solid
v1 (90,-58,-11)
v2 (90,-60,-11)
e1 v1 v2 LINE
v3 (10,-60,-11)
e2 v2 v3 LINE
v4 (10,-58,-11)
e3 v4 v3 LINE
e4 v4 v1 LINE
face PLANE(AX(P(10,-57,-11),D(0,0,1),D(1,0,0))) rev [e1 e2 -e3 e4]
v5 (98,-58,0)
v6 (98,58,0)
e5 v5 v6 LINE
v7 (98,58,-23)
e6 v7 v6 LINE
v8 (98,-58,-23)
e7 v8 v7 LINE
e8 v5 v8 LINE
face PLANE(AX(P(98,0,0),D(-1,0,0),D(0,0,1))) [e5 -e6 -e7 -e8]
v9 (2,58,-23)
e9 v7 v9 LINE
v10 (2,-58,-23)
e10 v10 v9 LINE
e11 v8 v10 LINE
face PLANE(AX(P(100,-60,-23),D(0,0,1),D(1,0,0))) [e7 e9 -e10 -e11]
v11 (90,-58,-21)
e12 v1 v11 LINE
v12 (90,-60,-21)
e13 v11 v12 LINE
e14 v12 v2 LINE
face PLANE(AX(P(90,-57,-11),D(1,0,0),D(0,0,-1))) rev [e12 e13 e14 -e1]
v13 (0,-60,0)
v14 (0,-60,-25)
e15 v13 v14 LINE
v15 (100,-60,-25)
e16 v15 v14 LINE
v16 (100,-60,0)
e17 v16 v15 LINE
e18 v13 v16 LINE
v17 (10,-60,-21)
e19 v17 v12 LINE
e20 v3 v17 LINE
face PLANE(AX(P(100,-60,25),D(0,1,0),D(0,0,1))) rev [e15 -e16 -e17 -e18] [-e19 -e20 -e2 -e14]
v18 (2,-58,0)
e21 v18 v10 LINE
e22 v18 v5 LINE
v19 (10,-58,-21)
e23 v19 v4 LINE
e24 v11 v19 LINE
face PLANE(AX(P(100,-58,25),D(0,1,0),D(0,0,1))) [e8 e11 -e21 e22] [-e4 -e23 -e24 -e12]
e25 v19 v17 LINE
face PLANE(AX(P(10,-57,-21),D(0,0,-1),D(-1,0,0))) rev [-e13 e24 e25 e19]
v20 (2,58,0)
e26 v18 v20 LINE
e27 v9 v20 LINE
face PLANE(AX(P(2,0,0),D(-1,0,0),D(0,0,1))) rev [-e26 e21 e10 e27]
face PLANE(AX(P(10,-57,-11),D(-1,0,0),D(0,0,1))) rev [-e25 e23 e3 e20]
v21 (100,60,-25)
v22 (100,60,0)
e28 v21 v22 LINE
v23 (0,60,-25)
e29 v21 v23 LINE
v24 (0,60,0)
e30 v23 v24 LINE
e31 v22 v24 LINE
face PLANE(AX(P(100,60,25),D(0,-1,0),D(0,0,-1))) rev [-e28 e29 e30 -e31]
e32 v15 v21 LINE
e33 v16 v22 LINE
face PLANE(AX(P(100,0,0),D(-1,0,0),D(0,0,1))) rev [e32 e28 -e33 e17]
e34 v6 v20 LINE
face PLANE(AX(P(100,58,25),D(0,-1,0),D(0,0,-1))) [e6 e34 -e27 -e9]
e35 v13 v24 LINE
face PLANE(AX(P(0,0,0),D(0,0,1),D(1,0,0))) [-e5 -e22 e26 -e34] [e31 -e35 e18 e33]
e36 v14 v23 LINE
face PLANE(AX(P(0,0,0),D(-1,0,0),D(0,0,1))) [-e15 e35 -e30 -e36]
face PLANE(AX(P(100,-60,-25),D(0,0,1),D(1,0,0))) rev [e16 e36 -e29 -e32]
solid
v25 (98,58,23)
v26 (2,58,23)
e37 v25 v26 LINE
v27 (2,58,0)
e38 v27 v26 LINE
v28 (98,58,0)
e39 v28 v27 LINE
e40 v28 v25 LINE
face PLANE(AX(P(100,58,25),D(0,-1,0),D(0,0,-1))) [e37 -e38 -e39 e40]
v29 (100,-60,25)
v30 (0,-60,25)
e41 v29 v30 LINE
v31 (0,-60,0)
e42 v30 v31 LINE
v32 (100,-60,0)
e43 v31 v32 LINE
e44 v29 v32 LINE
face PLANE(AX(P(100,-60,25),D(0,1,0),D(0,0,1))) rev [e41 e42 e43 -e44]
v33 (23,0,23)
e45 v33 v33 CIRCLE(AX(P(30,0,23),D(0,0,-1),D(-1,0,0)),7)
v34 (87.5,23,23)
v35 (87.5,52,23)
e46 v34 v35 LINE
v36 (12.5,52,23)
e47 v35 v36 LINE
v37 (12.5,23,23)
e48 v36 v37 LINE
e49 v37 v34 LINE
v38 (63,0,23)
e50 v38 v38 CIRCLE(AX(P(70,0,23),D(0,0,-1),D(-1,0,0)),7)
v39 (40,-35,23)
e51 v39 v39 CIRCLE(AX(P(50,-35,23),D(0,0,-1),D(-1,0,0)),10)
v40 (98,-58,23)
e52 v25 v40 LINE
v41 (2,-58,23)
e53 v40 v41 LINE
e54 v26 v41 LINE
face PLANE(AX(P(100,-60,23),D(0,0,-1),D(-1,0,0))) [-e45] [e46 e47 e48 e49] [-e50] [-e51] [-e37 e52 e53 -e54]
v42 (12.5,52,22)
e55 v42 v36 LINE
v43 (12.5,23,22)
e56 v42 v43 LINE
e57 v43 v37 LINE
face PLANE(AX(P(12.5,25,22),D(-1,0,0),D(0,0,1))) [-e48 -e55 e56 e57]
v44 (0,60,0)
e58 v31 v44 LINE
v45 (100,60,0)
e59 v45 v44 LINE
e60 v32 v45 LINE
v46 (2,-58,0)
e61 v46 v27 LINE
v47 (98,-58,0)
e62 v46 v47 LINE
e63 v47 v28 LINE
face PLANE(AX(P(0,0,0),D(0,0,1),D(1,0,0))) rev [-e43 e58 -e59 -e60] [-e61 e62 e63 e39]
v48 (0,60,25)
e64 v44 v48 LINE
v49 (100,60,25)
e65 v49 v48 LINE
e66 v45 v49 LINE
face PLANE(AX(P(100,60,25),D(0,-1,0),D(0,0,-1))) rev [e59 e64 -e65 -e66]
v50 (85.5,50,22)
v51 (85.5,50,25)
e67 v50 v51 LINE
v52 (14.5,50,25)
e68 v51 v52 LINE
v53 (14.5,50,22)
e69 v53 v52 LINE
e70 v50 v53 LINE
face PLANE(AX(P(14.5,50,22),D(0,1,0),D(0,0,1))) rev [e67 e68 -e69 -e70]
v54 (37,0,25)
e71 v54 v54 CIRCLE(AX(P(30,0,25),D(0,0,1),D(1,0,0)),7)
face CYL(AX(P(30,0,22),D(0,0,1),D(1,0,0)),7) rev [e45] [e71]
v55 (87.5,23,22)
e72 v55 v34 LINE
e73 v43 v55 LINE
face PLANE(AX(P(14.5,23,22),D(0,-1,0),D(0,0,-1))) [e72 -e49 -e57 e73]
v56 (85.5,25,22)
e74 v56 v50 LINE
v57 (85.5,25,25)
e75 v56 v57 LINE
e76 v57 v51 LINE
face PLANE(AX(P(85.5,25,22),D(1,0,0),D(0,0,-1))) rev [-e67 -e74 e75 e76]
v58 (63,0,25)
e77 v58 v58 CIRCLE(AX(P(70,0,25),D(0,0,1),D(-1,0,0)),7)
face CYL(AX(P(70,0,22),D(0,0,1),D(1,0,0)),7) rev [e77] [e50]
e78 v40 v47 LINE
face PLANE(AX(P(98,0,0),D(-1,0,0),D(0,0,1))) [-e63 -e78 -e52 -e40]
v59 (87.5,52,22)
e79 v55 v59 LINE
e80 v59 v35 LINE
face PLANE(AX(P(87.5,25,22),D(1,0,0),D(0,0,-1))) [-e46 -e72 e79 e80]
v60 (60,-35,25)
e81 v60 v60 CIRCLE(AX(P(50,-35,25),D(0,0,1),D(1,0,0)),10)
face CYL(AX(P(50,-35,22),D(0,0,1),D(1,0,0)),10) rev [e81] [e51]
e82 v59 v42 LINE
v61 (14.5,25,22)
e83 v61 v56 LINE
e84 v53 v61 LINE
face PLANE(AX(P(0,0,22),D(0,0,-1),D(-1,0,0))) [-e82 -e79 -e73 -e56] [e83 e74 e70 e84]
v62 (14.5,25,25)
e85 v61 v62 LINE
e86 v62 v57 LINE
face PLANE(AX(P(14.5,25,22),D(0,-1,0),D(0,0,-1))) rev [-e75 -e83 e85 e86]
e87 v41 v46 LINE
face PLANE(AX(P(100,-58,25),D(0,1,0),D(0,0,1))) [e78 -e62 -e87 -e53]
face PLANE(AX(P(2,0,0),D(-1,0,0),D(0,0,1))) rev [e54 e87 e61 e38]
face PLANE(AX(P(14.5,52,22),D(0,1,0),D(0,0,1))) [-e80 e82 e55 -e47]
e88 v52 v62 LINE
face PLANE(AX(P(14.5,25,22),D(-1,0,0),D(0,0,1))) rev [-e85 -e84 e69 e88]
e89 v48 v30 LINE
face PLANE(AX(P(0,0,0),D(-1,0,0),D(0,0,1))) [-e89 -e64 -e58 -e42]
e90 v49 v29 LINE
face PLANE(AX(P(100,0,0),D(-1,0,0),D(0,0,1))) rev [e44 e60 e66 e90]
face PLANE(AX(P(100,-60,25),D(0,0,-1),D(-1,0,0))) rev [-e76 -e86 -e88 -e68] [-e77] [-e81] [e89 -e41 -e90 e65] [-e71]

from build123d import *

# Parameters (mm, degrees)
SKETCH1_W            = 50
SKETCH1_H            = 120
BOSS_EXTRUDE1_DEPTH  = 100
SKETCH2_W            = 71
SKETCH2_H            = 25
CUT_EXTRUDE1_DEPTH   = 3
SHELL1_START         = -23
SHELL1_OUTLINE_W     = 96
SHELL1_OUTLINE_H     = 116
SHELL1_DEPTH         = 45
SHELL1_START_2       = 22
SHELL1_2_OUTLINE_W   = 96
SHELL1_2_OUTLINE_H   = 116
SHELL1_2_OUTLINE_W_2 = 75
SHELL1_2_OUTLINE_H_2 = 29
SHELL1_2_DEPTH       = 1
SKETCH3_W            = 80
SKETCH3_H            = 10
CUT_EXTRUDE2_DEPTH   = 3
SKETCH4_R            = 10
CUT_EXTRUDE3_DEPTH   = 3
SKETCH5_R            = 7
CUT_EXTRUDE4_DEPTH   = 3


# Read off the part's stored shape, not the designer's step: Shell1
with BuildPart() as part:
    # Sketch1 → Boss-Extrude1 (new body)
    with BuildSketch(Plane(origin=(0, 0, 0), x_dir=(0, 0, -1), z_dir=(1, 0, 0))):
        Rectangle(SKETCH1_W, SKETCH1_H)
    extrude(amount=BOSS_EXTRUDE1_DEPTH)

    # Sketch2 → Cut-Extrude1 (cut)
    with BuildSketch(Plane.XY.offset(25)):
        with Locations((50, 37.5)):
            Rectangle(SKETCH2_W, SKETCH2_H)
    extrude(amount=-CUT_EXTRUDE1_DEPTH, mode=Mode.SUBTRACT)

    # Shell1 outline → Shell1 (cut)
    with BuildSketch(Plane.XY.offset(SHELL1_START)):
        with Locations((50, 0)):
            Rectangle(SHELL1_OUTLINE_W, SHELL1_OUTLINE_H)
    extrude(amount=SHELL1_DEPTH, mode=Mode.SUBTRACT)

    # Shell1 2 outline → Shell1 2 (cut)
    with BuildSketch(Plane.XY.offset(SHELL1_START_2)):
        with Locations((50, 0)):
            Rectangle(SHELL1_2_OUTLINE_W, SHELL1_2_OUTLINE_H)
        with Locations((50, 37.5)):
            Rectangle(SHELL1_2_OUTLINE_W_2, SHELL1_2_OUTLINE_H_2, mode=Mode.SUBTRACT)
    extrude(amount=SHELL1_2_DEPTH, mode=Mode.SUBTRACT)

    # Sketch3 → Cut-Extrude2 (cut)
    with BuildSketch(Plane.XZ.offset(60)):
        with Locations((50, -16)):
            Rectangle(SKETCH3_W, SKETCH3_H)
    extrude(amount=-CUT_EXTRUDE2_DEPTH, mode=Mode.SUBTRACT)

    # Sketch4 → Cut-Extrude3 (cut)
    with BuildSketch(Plane.XY.offset(25)):
        with Locations((50, -35)):
            Circle(SKETCH4_R)
    extrude(amount=-CUT_EXTRUDE3_DEPTH, mode=Mode.SUBTRACT)

    # Sketch5 → Cut-Extrude4 (cut)
    with BuildSketch(Plane.XY.offset(25)):
        with Locations((30, 0)):
            Circle(SKETCH5_R)
        with Locations(Location((70, 0, 0), (0, 0, 180))):
            Circle(SKETCH5_R)
    extrude(amount=-CUT_EXTRUDE4_DEPTH, mode=Mode.SUBTRACT)


with BuildPart() as body_2:
    # Split1: the piece on the far side of the plane
    add(part.part)
    split(bisect_by=Plane.XY, keep=Keep.BOTTOM)


with BuildPart() as part_1:
    add(part.part)

    # Split1
    split(bisect_by=Plane.XY, keep=Keep.TOP)


solid = Compound([body_2.part, part_1.part])
